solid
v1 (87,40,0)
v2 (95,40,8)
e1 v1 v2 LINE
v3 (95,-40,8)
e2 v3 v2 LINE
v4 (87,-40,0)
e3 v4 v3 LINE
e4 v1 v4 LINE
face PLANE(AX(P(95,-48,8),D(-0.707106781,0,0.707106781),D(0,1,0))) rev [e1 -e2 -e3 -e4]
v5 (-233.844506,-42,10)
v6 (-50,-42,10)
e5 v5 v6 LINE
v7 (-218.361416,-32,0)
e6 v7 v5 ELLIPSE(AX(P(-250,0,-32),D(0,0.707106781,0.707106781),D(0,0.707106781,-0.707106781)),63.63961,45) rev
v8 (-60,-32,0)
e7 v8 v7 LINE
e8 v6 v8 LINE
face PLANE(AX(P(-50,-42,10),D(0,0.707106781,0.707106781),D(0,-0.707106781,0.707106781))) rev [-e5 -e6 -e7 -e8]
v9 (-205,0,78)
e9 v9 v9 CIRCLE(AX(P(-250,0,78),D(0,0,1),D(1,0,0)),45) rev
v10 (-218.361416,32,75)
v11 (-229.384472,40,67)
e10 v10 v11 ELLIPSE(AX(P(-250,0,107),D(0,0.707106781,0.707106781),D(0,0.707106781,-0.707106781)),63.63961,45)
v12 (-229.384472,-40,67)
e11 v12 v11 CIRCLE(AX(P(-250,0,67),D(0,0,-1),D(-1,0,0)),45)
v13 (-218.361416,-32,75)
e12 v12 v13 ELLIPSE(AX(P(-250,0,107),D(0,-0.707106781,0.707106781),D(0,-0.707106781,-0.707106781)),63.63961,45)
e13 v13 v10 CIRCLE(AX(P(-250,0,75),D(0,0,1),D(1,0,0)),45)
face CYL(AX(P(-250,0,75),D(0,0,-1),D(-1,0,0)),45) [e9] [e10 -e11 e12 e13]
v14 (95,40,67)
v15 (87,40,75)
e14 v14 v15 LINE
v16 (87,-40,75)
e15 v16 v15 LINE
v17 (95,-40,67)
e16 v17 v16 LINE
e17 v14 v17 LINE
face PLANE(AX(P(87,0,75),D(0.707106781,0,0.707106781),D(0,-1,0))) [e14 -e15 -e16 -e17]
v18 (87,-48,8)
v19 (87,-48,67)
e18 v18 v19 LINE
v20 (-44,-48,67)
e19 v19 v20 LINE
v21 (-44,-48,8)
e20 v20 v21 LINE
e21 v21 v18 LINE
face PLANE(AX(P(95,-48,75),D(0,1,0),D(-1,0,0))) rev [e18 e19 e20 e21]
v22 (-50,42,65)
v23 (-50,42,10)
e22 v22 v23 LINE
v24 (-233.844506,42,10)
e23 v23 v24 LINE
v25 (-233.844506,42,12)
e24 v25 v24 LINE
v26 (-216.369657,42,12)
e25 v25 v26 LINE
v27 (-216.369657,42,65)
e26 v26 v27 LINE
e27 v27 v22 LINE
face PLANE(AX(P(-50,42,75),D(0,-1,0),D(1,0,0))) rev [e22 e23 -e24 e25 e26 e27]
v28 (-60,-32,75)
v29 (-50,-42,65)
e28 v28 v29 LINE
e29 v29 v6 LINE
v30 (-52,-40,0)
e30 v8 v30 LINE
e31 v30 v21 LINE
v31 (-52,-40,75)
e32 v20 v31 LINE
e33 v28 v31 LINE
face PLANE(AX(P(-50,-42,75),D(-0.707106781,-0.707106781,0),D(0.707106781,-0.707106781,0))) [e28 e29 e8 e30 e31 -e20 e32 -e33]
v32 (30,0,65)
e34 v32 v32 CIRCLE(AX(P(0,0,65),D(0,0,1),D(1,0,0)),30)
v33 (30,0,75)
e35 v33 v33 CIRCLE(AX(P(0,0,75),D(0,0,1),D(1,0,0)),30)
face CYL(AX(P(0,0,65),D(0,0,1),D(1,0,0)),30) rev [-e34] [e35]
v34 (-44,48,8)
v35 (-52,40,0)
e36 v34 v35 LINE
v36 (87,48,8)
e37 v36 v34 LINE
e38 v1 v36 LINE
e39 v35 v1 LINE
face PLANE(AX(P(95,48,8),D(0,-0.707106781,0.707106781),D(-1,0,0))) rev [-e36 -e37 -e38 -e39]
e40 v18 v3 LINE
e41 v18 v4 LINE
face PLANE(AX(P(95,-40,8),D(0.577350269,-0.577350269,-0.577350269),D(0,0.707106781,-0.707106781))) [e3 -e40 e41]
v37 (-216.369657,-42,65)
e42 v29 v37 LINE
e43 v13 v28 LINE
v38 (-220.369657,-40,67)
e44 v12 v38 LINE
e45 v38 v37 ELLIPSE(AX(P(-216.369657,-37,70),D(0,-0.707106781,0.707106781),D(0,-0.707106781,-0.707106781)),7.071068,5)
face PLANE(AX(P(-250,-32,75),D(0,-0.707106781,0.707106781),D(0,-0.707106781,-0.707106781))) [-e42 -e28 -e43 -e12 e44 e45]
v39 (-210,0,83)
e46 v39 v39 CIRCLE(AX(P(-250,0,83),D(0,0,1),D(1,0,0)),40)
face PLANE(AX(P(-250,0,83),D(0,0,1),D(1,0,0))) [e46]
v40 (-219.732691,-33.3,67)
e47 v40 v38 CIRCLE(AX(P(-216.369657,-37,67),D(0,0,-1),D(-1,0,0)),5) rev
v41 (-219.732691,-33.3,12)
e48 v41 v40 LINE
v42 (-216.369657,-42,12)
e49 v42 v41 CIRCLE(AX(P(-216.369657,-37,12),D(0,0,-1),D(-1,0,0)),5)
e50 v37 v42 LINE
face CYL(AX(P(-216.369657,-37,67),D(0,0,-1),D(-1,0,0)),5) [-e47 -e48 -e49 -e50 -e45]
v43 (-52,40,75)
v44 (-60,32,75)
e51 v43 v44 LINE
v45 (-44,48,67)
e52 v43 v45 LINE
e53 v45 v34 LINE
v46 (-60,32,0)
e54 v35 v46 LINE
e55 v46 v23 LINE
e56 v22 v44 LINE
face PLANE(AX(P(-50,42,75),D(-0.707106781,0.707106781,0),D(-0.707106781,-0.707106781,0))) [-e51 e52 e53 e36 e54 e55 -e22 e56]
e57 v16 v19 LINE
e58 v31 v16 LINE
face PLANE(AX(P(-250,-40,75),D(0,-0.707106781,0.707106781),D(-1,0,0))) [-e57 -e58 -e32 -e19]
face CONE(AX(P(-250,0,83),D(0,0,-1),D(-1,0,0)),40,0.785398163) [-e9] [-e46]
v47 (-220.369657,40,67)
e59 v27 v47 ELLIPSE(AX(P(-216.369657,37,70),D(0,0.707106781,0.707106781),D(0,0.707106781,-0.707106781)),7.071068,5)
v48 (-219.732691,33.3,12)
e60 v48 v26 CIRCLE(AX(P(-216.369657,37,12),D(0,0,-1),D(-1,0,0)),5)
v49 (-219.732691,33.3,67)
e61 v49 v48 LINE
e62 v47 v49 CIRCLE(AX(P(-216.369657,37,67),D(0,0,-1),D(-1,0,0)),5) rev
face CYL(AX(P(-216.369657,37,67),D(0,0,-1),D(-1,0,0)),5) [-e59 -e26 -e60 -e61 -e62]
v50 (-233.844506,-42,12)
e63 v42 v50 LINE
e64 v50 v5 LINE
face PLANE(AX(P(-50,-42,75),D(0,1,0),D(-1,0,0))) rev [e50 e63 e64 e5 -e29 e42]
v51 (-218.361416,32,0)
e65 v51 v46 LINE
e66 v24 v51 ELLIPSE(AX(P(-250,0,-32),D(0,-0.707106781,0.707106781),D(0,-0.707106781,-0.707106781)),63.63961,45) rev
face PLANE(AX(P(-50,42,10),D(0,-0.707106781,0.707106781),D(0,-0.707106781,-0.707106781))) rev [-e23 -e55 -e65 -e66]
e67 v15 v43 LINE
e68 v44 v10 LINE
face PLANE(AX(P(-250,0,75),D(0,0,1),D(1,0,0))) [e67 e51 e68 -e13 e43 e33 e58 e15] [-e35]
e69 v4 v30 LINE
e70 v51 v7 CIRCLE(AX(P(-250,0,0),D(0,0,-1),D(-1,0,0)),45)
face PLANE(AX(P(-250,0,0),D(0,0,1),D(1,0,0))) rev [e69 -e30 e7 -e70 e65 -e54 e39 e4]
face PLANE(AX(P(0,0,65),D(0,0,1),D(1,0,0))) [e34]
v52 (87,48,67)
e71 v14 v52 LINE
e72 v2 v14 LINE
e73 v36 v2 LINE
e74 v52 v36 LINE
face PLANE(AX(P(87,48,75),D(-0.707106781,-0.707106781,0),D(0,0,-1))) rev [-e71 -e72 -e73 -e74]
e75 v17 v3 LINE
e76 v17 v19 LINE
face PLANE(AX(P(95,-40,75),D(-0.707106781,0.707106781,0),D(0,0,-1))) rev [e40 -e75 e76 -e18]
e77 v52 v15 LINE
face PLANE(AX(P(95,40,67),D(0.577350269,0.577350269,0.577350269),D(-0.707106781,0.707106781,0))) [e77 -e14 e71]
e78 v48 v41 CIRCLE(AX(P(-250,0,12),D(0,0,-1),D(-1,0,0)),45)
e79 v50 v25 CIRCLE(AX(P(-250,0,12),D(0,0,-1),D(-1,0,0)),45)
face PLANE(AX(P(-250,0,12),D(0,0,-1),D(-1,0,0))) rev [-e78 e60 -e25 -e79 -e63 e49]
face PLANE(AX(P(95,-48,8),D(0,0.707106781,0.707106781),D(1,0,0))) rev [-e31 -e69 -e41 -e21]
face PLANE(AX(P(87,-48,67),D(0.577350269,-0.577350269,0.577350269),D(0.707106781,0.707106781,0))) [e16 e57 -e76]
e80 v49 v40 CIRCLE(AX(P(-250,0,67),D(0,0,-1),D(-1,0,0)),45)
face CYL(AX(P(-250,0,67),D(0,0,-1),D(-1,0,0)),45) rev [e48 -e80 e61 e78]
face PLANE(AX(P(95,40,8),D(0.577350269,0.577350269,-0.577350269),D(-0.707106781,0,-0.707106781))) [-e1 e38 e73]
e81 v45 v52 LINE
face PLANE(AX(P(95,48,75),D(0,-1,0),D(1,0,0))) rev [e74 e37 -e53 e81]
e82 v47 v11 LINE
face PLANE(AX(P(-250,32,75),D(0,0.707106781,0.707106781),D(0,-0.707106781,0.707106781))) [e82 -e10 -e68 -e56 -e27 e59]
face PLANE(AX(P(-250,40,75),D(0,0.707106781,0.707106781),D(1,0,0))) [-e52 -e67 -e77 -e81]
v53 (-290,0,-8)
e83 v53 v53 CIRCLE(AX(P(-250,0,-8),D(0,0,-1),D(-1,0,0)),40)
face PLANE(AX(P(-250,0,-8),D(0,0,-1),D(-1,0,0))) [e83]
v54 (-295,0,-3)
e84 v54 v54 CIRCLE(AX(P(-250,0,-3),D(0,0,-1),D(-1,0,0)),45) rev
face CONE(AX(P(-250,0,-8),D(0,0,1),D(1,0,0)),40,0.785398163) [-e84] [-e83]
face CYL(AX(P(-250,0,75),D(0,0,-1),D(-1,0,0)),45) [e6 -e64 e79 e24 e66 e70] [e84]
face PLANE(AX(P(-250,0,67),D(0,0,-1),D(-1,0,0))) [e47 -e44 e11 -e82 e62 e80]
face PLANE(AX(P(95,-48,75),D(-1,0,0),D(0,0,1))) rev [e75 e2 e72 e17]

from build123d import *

# Parameters (mm, degrees)
BOSS_EXTRU_1_DEPTH = 75
SKETCH3_R          = 30
CUT_EXTRUDE3_DEPTH = 10
ESQUISSE2_R        = 45
BOSS_EXTRU_2_DEPTH = 8
CHANFREIN1_SIZE    = 5
BOSS_EXTRU_3_START = 8
ESQUISSE3_R        = 45
BOSS_EXTRU_3_DEPTH = 8
CHANFREIN2_SIZE    = 5
D_POUILLE5_ANGLE   = 45
D_POUILLE6_ANGLE   = 45
CHANFREIN4_SIZE    = 10
SKETCH2_R          = 45
CUT_EXTRUDE2_DEPTH = 55
FILLET1_R          = 5
CHAMFER1_SIZE      = 8


with BuildPart() as part:
    # Esquisse1 → Boss.-Extru.1 (new body)
    with BuildSketch(Plane.XY):
        with BuildLine():
            Line((95, -48), (95, 48))
            Line((95, 48), (-50, 48))
            Line((-50, 48), (-50, 42))
            Line((-50, 42), (-233.844505579, 42))
            ThreePointArc((-233.844505579, 42), (-295, 0), (-233.844505579, -42))
            Line((-233.844505579, -42), (-50, -42))
            Line((-50, -42), (-50, -48))
            Line((-50, -48), (95, -48))
        make_face()
    extrude(amount=BOSS_EXTRU_1_DEPTH)

    # Sketch3 → Cut-Extrude3 (cut)
    with BuildSketch(Plane.XY.offset(75)):
        Circle(SKETCH3_R)
    extrude(amount=-CUT_EXTRUDE3_DEPTH, mode=Mode.SUBTRACT)

    # Esquisse2 → Boss.-Extru.2 (add)
    with BuildSketch(Plane.XY.offset(75)):
        with Locations(Location((-250, 0, 0), (0, 0, 68.960530219))):
            Circle(ESQUISSE2_R)
    extrude(amount=BOSS_EXTRU_2_DEPTH)

    # Chanfrein1
    chanfrein1_edges = [part.edges().sort_by_distance(p)[0] for p in [
        (-266.155494421, -42, 83),
    ]]
    chamfer(chanfrein1_edges, length=CHANFREIN1_SIZE)

    # Esquisse3 → Boss.-Extru.3 (add)
    with BuildSketch(Plane(origin=(0, 0, 0), x_dir=(-1, 0, 0), z_dir=(0, 0, -1)).offset(BOSS_EXTRU_3_START)):
        with Locations((250, 0)):
            Circle(ESQUISSE3_R)
    extrude(amount=-BOSS_EXTRU_3_DEPTH)

    # Chanfrein2
    chanfrein2_edges = [part.edges().sort_by_distance(p)[0] for p in [
        (-205, 0, -8),
    ]]
    chamfer(chanfrein2_edges, length=CHANFREIN2_SIZE)

    # Dépouille5
    d_pouille5_faces = [part.faces().sort_by_distance(p)[0] for p in [
        (-50, 45, 37.5),
    ]]
    draft(d_pouille5_faces, Plane(origin=(-50, 42, 75), x_dir=(1, 0, 0), z_dir=(0, 1, 0)), D_POUILLE5_ANGLE)

    # Dépouille6
    d_pouille6_faces = [part.faces().sort_by_distance(p)[0] for p in [
        (-50, -45, 37.5),
    ]]
    draft(d_pouille6_faces, Plane(origin=(-50, -42, 75), x_dir=(-1, 0, 0), z_dir=(0, -1, 0)), D_POUILLE6_ANGLE)

    # Chanfrein4
    # the kernel refuses this chamfer: 10 mm, written as the material it takes off along each edge
    with BuildSketch(Plane(origin=(-259.561335458, -42, 75), x_dir=(0, -0.027495876610586317, -0.9996219169112968), z_dir=(1, 0, 0))) as chanfrein4_piece_1_section:
        Polygon((CHANFREIN4_SIZE * 0.999621916911, CHANFREIN4_SIZE * 0.0274958766106), (-CHANFREIN4_SIZE * 0.0274958766106, CHANFREIN4_SIZE * 0.999621916911), (0, 0), align=None)
    chanfrein4_piece_1 = extrude(amount=235.278165338, mode=Mode.PRIVATE)
    chanfrein4_piece_1 = chanfrein4_piece_1 - Plane(origin=(-250, 0, 71.650306889), x_dir=(0.35901098714230106, 0.9333333333333331, 0), z_dir=(0, 0, -1)) * Cylinder(45, 511, mode=Mode.PRIVATE)
    chanfrein4_piece_1 = split(chanfrein4_piece_1, bisect_by=Plane(origin=(-96.832103128, 4.832103128, 71.650306889), z_dir=(-0.7071067811865462, -0.7071067811865488, 0)), keep=Keep.TOP, mode=Mode.PRIVATE)
    add(chanfrein4_piece_1, mode=Mode.SUBTRACT)
    with BuildSketch(Plane(origin=(-259.561335458, -42, 0), x_dir=(0, 0.9996219169112968, -0.027495876610586372), z_dir=(1, 0, 0))) as chanfrein4_piece_2_section:
        Polygon((CHANFREIN4_SIZE * 0.999621916911, CHANFREIN4_SIZE * 0.0274958766106), (-CHANFREIN4_SIZE * 0.0274958766106, CHANFREIN4_SIZE * 0.999621916911), (0, 0), align=None)
    chanfrein4_piece_2 = extrude(amount=235.278165338, mode=Mode.PRIVATE)
    chanfrein4_piece_2 = chanfrein4_piece_2 - Plane(origin=(-250, 0, 3.349693111), x_dir=(-1, 0, 0), z_dir=(0, 0, -1)) * Cylinder(45, 511, mode=Mode.PRIVATE)
    chanfrein4_piece_2 = split(chanfrein4_piece_2, bisect_by=Plane(origin=(-96.832103062, 4.832103062, 3.349693111), z_dir=(-0.7071067811865462, -0.7071067811865488, 0)), keep=Keep.TOP, mode=Mode.PRIVATE)
    add(chanfrein4_piece_2, mode=Mode.SUBTRACT)
    with BuildSketch(Plane(origin=(-24.28317012, 42, 0), x_dir=(0, -0.9996219169112968, -0.027495876610586372), z_dir=(-1, 0, 0))) as chanfrein4_piece_3_section:
        Polygon((CHANFREIN4_SIZE * 0.999621916911, CHANFREIN4_SIZE * 0.0274958766106), (-CHANFREIN4_SIZE * 0.0274958766106, CHANFREIN4_SIZE * 0.999621916911), (0, 0), align=None)
    chanfrein4_piece_3 = extrude(amount=235.278165338, mode=Mode.PRIVATE)
    chanfrein4_piece_3 = chanfrein4_piece_3 - Plane(origin=(-250, 0, 3.349693112), x_dir=(-1, 0, 0), z_dir=(0, 0, -1)) * Cylinder(45, 511, mode=Mode.PRIVATE)
    chanfrein4_piece_3 = split(chanfrein4_piece_3, bisect_by=Plane(origin=(-96.832103108, -4.832103108, 3.349693112), z_dir=(-0.7071067811865462, 0.7071067811865488, 0)), keep=Keep.TOP, mode=Mode.PRIVATE)
    add(chanfrein4_piece_3, mode=Mode.SUBTRACT)
    with BuildSketch(Plane(origin=(-24.28317012, 42, 75), x_dir=(0, 0.027495876610586317, -0.9996219169112968), z_dir=(-1, 0, 0))) as chanfrein4_piece_4_section:
        Polygon((CHANFREIN4_SIZE * 0.999621916911, CHANFREIN4_SIZE * 0.0274958766106), (-CHANFREIN4_SIZE * 0.0274958766106, CHANFREIN4_SIZE * 0.999621916911), (0, 0), align=None)
    chanfrein4_piece_4 = extrude(amount=235.278165338, mode=Mode.PRIVATE)
    chanfrein4_piece_4 = chanfrein4_piece_4 - Plane(origin=(-250, 0, 71.65030689), x_dir=(0.35901098714230106, 0.9333333333333331, 0), z_dir=(0, 0, -1)) * Cylinder(45, 511, mode=Mode.PRIVATE)
    chanfrein4_piece_4 = split(chanfrein4_piece_4, bisect_by=Plane(origin=(-96.832103072, -4.832103072, 71.65030689), z_dir=(-0.7071067811865462, 0.7071067811865488, 0)), keep=Keep.TOP, mode=Mode.PRIVATE)
    add(chanfrein4_piece_4, mode=Mode.SUBTRACT)

    # Sketch2 → Cut-Extrude2 (cut)
    with BuildSketch(Plane(origin=(0, 0, 12), x_dir=(-1, 0, 0), z_dir=(0, 0, -1))):
        with Locations(Location((250, 0, 0), (0, 0, 242.733955549))):
            Circle(SKETCH2_R)
    extrude(amount=-CUT_EXTRUDE2_DEPTH, mode=Mode.SUBTRACT)

    # Fillet1
    # the kernel refuses this fillet: 5 mm, written as the material it takes off along each edge
    with BuildSketch(Plane(origin=(-233.844505579, -42, 12), x_dir=(0.8512324625883901, 0.5247888095564778, 0), z_dir=(0, 0, 1))) as fillet1_piece_1_section:
        with BuildLine():
            CenterArc((17.499102813, -4.914442902), FILLET1_R, 100.614557324, 137.73141557)
            Line((14.875158765, -9.170605214), (0, 0))
            ThreePointArc((0, 0), (8.289048701, -0.770013886), (16.578097401, 0))
        make_face()
    fillet1_piece_1 = extrude(amount=96.68712255, mode=Mode.PRIVATE)
    fillet1_piece_1 = split(fillet1_piece_1, bisect_by=Plane(origin=(-224.59334288, -39.762552666, 67), z_dir=(0, 0, -1)), keep=Keep.TOP, mode=Mode.PRIVATE)
    add(fillet1_piece_1, mode=Mode.SUBTRACT)
    with BuildSketch(Plane(origin=(-233.844505579, 42, 12), x_dir=(0.8512324625883905, -0.5247888095564773, 0), z_dir=(0, 0, 1))) as fillet1_piece_2_section:
        with BuildLine():
            CenterArc((17.499102813, 4.914442902), FILLET1_R, 121.654027105, 137.73141557)
            Line((14.875158765, 9.170605214), (0, 0))
            ThreePointArc((0, 0), (8.289048701, 0.770013886), (16.578097401, 0))
        make_face()
    fillet1_piece_2 = extrude(amount=96.68712255, mode=Mode.PRIVATE)
    fillet1_piece_2 = split(fillet1_piece_2, bisect_by=Plane(origin=(-224.59334288, 39.762552666, 67), z_dir=(0, 0, -1)), keep=Keep.TOP, mode=Mode.PRIVATE)
    add(fillet1_piece_2, mode=Mode.SUBTRACT)

    # Chamfer1
    chamfer1_edges = [part.edges().sort_by_distance(p)[0] for p in [
        (25.5, 48, 0),
        (95, 48, 37.5),
        (95, -48, 37.5),
        (25.5, -48, 75),
        (95, 0, 75),
        (25.5, 48, 75),
        (95, 0, 0),
        (25.5, -48, 0),
    ]]
    chamfer(chamfer1_edges, length=CHAMFER1_SIZE)


solid = part.part
